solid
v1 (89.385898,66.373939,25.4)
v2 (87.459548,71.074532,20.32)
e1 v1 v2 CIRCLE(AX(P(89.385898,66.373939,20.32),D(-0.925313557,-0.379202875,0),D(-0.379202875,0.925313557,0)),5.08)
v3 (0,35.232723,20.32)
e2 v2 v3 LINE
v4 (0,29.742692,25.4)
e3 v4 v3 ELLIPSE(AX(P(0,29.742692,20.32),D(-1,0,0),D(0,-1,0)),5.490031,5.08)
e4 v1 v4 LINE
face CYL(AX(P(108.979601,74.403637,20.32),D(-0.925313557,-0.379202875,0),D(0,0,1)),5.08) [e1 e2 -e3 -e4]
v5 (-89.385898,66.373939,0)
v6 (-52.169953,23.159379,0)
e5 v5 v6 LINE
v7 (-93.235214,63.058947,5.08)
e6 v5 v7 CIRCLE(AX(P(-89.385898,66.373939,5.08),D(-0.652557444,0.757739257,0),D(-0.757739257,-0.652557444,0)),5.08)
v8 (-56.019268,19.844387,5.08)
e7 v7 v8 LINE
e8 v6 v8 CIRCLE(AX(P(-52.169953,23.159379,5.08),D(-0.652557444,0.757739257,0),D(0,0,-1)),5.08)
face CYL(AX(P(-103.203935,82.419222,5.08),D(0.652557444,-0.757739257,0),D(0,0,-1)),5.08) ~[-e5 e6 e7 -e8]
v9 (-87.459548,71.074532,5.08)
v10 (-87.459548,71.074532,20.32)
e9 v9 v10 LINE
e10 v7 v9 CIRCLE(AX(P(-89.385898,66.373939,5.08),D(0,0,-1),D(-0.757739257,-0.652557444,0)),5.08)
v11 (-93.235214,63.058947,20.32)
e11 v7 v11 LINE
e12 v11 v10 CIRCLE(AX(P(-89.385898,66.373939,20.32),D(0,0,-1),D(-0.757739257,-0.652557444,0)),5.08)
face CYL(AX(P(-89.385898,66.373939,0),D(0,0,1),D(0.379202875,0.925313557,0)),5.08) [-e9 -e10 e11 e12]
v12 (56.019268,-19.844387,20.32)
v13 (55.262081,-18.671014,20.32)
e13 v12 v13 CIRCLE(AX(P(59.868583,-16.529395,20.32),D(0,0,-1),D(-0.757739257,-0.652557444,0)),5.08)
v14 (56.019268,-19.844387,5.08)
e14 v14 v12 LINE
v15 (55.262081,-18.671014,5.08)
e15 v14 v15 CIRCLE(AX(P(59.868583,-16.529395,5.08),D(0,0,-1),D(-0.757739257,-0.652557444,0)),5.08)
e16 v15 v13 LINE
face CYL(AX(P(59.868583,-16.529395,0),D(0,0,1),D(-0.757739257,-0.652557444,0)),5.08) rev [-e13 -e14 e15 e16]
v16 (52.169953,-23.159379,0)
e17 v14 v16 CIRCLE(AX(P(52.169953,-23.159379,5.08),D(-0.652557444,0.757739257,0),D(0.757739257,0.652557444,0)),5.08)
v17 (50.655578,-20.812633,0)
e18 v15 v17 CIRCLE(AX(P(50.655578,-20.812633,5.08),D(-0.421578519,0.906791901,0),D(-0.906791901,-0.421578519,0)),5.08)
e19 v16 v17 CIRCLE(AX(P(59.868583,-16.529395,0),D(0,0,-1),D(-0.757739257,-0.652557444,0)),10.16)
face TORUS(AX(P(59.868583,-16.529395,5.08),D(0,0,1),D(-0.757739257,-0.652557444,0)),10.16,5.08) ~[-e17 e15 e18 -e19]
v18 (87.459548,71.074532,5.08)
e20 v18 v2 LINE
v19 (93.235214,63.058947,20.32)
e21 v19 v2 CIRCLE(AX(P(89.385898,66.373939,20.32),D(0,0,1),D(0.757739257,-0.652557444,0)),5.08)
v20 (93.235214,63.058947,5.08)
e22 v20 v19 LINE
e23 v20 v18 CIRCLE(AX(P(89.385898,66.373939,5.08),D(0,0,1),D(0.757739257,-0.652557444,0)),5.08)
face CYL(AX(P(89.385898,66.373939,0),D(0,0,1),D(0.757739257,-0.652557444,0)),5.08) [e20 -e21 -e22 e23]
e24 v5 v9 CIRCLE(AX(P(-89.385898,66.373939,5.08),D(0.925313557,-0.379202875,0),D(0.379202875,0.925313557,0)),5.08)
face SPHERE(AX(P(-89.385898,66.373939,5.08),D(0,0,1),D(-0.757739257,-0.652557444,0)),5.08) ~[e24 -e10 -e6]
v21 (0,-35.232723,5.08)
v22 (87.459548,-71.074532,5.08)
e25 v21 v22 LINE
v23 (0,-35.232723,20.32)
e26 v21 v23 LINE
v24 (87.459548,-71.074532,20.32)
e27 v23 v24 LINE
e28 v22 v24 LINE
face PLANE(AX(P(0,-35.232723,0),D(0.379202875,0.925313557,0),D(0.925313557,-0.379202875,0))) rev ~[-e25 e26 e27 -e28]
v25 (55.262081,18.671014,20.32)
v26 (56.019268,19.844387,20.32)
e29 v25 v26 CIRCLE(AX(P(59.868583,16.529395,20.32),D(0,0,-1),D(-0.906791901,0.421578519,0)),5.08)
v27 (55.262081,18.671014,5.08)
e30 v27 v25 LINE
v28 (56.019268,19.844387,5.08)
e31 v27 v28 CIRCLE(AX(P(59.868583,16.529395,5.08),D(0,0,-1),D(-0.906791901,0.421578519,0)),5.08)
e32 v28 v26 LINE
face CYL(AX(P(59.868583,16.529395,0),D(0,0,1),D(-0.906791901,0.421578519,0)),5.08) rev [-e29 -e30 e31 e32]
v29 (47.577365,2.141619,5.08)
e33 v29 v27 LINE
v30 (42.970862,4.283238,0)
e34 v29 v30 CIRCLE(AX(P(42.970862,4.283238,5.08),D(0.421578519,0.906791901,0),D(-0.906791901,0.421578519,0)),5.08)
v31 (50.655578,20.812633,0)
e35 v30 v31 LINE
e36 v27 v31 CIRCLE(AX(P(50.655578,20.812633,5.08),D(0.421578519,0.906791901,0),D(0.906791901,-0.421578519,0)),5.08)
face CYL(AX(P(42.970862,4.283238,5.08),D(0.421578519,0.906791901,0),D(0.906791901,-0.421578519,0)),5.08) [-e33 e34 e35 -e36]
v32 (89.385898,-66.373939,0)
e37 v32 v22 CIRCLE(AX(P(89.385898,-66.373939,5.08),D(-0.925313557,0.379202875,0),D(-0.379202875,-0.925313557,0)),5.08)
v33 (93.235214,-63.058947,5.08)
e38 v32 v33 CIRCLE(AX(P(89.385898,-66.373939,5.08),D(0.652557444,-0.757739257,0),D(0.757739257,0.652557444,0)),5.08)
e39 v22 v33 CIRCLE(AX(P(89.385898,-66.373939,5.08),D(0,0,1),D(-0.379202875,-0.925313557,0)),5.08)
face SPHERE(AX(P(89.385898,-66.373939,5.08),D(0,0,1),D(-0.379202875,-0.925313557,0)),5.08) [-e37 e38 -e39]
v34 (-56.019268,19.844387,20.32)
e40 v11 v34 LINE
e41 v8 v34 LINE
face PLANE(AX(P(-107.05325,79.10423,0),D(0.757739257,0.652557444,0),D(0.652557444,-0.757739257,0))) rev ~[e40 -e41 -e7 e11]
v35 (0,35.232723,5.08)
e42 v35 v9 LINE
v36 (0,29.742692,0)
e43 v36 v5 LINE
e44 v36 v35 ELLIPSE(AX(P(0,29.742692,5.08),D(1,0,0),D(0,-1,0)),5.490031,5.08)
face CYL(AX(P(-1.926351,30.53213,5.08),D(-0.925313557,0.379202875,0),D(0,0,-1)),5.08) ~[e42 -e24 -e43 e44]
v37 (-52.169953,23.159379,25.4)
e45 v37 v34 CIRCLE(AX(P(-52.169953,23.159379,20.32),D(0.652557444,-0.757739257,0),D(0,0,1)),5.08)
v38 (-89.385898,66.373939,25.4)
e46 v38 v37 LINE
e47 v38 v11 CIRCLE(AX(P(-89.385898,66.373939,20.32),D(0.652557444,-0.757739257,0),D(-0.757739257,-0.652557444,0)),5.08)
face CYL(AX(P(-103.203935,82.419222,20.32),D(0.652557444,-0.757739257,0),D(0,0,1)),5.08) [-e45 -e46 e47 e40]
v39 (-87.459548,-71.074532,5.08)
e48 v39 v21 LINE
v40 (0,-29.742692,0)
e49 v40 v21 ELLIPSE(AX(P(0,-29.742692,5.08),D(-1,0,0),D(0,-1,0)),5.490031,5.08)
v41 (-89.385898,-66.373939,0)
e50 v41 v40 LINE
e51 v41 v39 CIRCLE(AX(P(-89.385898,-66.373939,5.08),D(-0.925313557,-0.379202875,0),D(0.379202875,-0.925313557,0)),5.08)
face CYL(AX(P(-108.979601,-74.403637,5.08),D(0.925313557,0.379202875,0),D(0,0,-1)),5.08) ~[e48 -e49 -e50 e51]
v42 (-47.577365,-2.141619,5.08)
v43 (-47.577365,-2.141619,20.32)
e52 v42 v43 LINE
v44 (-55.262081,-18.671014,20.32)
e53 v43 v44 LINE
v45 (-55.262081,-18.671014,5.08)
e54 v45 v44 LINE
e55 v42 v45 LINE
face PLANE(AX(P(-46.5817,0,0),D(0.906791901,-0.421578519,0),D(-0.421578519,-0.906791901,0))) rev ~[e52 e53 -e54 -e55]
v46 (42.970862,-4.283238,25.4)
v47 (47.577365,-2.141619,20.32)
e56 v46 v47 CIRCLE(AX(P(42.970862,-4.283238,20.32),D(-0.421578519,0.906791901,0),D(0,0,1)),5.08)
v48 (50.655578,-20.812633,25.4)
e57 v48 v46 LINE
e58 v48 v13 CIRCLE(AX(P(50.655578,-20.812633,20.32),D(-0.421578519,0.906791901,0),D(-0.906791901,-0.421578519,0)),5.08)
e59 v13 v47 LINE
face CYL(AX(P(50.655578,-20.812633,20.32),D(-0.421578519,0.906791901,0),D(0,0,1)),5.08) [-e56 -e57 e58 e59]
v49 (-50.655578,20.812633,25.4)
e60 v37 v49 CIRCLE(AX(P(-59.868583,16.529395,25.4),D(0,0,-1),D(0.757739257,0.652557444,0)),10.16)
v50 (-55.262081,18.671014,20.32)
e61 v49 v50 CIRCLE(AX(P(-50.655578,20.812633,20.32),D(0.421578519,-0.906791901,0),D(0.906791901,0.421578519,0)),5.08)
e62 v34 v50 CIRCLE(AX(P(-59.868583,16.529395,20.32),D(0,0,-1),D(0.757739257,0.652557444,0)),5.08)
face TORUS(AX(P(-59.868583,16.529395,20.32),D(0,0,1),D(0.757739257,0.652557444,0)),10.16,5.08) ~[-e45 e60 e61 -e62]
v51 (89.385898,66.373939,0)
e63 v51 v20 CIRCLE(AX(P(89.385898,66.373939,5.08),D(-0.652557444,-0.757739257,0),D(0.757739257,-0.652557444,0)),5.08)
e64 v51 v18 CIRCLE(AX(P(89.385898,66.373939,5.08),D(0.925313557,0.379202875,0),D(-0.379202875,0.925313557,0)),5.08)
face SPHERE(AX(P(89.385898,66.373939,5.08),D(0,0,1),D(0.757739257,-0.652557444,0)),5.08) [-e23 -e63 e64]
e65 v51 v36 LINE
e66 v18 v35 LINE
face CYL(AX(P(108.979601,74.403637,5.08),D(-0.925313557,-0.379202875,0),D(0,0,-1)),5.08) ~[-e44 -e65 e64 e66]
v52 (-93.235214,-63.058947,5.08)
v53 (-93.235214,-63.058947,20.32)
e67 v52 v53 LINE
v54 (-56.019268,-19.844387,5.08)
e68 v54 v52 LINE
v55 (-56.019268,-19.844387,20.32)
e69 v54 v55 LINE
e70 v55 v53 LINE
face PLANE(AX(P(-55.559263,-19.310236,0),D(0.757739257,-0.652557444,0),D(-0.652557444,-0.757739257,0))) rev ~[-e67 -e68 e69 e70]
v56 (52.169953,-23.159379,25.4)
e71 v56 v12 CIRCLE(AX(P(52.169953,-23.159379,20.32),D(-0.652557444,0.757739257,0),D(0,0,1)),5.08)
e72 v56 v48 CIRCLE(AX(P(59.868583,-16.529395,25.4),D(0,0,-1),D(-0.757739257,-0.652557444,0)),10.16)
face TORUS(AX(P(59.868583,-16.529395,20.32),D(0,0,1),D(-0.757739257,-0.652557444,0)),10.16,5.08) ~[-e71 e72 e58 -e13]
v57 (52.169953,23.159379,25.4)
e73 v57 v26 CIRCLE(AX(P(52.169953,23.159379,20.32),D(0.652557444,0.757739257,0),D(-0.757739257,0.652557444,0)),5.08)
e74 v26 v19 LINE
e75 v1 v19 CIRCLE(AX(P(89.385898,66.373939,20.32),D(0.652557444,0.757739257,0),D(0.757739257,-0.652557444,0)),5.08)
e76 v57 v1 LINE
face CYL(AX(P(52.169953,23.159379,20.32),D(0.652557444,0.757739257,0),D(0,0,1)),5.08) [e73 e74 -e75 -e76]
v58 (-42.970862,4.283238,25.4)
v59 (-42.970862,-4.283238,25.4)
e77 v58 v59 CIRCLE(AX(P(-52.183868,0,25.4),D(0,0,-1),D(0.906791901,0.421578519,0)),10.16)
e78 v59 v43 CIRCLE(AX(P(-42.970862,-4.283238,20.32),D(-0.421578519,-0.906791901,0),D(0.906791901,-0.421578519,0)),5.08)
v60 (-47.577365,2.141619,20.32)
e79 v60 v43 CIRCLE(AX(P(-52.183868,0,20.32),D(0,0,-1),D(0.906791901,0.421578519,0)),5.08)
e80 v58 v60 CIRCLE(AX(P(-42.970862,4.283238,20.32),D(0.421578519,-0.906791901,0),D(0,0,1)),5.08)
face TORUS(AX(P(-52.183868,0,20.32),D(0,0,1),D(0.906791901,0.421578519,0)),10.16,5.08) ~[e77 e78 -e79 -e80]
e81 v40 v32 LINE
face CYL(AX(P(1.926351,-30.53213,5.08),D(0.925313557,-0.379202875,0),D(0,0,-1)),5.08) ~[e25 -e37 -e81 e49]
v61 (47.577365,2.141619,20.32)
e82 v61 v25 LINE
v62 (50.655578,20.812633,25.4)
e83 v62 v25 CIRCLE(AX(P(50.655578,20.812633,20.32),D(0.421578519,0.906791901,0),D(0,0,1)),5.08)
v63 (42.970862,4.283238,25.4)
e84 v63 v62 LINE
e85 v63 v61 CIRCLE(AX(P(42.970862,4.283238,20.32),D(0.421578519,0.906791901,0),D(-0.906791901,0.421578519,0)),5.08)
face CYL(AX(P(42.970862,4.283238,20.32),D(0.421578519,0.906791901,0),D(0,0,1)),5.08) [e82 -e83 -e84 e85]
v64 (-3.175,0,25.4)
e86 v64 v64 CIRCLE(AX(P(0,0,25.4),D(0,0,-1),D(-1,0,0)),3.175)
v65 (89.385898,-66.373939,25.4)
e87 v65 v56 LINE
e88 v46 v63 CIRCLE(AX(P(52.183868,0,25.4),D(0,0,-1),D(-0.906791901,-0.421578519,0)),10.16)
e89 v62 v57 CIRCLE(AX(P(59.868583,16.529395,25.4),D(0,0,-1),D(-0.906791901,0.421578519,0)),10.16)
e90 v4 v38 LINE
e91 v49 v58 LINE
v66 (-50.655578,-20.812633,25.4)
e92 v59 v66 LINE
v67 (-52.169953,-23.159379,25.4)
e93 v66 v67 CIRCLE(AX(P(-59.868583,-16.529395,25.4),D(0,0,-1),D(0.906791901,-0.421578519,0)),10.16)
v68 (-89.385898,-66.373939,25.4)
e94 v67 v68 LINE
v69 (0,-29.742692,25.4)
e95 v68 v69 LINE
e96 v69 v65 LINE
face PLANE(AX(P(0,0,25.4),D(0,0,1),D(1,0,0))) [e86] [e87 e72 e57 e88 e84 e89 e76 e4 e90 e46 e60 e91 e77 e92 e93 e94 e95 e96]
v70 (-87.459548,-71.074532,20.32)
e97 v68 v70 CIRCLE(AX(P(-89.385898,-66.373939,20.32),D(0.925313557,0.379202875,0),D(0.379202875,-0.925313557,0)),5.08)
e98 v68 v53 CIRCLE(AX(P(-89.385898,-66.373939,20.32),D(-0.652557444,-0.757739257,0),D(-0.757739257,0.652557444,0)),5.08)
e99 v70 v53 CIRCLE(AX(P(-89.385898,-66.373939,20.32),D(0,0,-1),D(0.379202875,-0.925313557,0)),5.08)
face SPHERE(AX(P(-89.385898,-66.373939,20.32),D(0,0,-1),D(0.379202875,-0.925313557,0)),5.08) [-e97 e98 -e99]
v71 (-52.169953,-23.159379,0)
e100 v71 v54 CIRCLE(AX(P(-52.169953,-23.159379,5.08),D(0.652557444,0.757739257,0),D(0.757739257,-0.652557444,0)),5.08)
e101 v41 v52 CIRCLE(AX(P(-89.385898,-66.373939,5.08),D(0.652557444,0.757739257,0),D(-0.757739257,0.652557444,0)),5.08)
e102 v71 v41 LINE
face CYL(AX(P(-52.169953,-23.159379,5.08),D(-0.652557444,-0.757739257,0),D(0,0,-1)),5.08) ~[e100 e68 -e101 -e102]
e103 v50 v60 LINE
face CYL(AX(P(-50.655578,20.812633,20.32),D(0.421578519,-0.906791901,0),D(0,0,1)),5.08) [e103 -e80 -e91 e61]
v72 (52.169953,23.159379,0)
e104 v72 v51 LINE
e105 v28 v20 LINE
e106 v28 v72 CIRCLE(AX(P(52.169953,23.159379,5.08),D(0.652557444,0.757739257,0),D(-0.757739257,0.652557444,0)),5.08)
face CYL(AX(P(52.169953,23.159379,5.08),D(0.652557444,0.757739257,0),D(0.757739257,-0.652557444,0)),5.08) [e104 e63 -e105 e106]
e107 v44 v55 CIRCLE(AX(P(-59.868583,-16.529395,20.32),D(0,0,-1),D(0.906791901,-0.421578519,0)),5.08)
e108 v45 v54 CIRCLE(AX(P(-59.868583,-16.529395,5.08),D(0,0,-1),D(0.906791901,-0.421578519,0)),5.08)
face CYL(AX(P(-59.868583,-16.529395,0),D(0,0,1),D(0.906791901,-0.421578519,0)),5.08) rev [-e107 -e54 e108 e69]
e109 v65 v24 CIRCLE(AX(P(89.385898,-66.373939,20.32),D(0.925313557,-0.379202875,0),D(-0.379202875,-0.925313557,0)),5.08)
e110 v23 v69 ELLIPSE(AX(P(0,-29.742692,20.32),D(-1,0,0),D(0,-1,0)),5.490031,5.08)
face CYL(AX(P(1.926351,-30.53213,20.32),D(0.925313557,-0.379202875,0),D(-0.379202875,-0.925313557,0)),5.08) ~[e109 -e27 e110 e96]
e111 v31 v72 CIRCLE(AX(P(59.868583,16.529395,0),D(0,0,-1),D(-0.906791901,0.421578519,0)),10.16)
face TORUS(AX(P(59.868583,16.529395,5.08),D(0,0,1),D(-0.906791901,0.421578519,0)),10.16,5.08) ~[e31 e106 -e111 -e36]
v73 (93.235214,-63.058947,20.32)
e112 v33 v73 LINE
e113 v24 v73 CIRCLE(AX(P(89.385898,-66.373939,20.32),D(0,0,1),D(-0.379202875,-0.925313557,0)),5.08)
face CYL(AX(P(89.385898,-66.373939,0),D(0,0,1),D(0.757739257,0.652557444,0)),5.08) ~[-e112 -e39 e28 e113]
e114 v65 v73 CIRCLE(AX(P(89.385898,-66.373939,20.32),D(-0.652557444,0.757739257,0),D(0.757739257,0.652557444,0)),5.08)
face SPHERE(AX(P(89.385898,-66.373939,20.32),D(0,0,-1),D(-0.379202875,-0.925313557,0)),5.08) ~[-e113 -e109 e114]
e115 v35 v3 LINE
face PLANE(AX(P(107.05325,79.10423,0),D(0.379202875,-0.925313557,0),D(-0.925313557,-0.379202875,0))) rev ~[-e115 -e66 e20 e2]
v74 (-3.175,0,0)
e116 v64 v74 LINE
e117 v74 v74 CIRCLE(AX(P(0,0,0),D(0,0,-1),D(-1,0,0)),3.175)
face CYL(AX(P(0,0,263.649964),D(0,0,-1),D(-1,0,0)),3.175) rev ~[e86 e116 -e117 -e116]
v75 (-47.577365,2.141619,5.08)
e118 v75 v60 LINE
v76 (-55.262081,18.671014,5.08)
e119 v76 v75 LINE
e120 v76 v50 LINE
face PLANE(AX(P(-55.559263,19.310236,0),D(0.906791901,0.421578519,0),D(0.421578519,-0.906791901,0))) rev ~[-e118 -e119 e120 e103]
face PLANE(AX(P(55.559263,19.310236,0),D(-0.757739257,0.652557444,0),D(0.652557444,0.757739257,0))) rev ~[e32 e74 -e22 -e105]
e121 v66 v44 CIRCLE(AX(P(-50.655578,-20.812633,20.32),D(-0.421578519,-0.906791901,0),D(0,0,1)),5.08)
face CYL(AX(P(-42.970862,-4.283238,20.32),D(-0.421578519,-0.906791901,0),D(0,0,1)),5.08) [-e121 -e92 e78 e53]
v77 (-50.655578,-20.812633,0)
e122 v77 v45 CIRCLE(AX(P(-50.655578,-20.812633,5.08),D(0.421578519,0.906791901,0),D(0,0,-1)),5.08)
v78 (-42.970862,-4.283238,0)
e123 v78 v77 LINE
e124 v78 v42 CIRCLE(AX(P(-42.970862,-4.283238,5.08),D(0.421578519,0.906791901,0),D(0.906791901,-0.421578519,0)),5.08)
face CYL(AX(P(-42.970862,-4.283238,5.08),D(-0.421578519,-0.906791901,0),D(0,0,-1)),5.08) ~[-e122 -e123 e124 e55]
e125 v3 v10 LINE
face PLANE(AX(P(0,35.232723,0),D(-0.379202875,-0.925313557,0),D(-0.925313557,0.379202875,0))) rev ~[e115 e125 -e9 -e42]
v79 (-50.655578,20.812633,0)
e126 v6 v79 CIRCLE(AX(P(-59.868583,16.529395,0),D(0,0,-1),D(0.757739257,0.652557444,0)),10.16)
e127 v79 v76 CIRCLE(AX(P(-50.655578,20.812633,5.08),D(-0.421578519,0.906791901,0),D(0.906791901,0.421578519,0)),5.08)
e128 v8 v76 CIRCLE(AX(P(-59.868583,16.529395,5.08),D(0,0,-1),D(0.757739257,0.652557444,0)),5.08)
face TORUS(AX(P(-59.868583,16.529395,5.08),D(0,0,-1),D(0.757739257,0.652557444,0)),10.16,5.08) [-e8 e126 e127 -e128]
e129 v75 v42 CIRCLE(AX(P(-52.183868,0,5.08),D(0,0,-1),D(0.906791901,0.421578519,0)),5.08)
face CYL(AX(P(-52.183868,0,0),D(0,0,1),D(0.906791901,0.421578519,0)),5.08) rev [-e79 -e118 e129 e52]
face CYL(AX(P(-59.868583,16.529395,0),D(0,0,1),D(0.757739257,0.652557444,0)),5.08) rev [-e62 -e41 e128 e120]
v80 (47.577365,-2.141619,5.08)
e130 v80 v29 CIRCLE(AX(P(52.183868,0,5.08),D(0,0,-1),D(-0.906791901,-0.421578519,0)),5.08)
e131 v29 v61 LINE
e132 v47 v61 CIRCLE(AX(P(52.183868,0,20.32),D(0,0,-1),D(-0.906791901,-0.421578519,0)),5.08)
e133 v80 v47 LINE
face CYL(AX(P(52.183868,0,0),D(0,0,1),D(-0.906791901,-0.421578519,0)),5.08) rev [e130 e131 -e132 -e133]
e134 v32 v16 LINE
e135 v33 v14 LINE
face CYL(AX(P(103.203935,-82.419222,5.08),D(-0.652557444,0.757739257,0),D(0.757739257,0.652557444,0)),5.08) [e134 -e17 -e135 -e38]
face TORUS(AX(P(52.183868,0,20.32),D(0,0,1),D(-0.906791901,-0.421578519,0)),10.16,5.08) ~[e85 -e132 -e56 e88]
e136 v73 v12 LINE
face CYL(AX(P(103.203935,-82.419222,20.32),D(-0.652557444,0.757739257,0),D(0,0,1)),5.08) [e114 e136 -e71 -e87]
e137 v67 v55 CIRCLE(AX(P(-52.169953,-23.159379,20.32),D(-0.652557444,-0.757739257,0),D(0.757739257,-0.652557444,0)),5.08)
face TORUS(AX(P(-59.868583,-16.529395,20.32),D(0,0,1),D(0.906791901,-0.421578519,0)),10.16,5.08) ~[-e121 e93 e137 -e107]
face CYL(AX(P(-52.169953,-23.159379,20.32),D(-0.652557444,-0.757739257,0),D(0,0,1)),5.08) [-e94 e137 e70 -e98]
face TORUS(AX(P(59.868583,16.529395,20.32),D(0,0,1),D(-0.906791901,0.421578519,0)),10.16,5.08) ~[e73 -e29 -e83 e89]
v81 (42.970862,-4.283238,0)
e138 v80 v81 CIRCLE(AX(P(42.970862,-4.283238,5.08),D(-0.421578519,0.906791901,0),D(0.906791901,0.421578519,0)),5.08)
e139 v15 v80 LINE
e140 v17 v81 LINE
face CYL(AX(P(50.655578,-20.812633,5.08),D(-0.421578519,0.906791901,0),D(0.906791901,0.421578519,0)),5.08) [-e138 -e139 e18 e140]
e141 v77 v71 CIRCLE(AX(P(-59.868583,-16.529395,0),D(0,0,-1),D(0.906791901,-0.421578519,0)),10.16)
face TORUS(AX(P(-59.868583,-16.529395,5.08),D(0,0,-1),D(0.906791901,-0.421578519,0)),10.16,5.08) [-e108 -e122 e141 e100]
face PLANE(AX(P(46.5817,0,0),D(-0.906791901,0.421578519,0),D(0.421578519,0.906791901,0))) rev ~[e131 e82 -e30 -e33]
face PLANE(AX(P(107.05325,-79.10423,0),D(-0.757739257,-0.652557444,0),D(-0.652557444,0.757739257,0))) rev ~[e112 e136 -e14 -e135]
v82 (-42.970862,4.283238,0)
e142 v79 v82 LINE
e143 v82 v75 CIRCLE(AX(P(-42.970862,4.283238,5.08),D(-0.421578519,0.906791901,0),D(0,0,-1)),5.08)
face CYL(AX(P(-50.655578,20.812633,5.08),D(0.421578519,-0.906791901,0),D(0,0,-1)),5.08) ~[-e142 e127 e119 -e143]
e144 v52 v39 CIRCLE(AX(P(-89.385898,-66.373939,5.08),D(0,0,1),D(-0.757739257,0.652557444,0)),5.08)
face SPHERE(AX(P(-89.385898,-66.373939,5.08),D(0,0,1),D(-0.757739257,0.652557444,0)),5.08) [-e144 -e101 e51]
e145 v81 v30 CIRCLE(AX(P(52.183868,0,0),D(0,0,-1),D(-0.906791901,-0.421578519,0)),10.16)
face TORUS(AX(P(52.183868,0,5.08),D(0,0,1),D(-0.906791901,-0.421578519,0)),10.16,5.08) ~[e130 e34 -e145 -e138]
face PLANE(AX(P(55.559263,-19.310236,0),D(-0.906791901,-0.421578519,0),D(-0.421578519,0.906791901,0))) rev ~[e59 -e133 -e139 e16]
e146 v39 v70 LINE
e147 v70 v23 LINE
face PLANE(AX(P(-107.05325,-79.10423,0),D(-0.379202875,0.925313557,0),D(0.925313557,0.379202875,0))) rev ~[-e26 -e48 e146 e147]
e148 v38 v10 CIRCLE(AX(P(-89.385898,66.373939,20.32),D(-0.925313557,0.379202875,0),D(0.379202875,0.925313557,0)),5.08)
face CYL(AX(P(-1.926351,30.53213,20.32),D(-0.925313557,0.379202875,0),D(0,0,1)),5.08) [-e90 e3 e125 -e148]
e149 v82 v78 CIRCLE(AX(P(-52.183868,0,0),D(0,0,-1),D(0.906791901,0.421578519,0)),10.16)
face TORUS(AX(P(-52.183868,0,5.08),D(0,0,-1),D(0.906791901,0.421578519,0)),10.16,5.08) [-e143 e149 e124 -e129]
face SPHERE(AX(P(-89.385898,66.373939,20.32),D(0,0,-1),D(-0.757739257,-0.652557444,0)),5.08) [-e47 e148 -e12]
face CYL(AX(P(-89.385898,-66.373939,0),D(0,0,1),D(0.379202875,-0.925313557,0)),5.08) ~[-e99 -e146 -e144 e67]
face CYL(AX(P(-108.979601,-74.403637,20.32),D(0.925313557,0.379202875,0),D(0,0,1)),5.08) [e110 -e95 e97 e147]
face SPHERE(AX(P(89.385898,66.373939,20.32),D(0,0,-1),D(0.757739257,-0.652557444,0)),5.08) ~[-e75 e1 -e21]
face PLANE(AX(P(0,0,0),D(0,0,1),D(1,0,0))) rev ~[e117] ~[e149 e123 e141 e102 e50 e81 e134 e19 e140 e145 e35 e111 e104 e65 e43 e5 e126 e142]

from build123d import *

# Parameters (mm, degrees)
F2_DEPTH = 25.4
F3_F1_R  = 5.08
F3_F2_R  = 5.08
F6_D     = 6.35


# Not quite as in the source:
# - the program builds the solid bodies; features that only make, move or delete a surface that nothing else refers to are left out


with BuildPart() as f2:
    # F1 (on Top) → F2 (new body)
    with BuildSketch(Plane.XY):
        Polygon((-107.0532500744, -79.1042298079), (0, -35.2327227592), (107.0532500744, -79.1042298079), (55.5592626333, -19.3102359772), (46.5817004442, 0), (55.5592626333, 19.3102359772), (107.0532500744, 79.1042298079), (0, 35.2327227592), (-107.0532500744, 79.1042298079), (-55.5592626333, 19.3102359772), (-46.5817004442, 0), (-55.5592626333, -19.3102359772), align=None)
    extrude(amount=F2_DEPTH)

    # F3: fillet of radius 5.08 on 32 edges, made by hand

    # F3_f1
    f3_f1_edges = [f2.edges().sort_by_distance(p)[0] for p in [
        (-55.5592626333, -19.3102359772, 12.7),
        (-46.5817004442, 0, 12.7),
        (-55.5592626333, 19.3102359772, 12.7),
        (55.5592626333, -19.3102359772, 12.7),
        (46.5817004442, 0, 12.7),
        (55.5592626333, 19.3102359772, 12.7),
    ]]
    fillet(f3_f1_edges, radius=F3_F1_R)

    # F3_f2
    f3_f2_edges = [f2.edges().sort_by_distance(p)[0] for p in [
        (53.5266250372, 57.1684762836, 25.4),
        (53.5266250372, 57.1684762836, 0),
        (107.0532500744, 79.1042298079, 12.7),
        (81.5362590314, 49.4743083195, 25.4),
        (51.4197227557, 10.4063163842, 25.4),
        (51.4197227557, -10.4063163842, 25.4),
        (81.5362590314, -49.4743083195, 25.4),
        (107.0532500744, -79.1042298079, 12.7),
        (53.5266250372, -57.1684762836, 0),
        (53.5266250372, -57.1684762836, 25.4),
        (-81.5362590314, 49.4743083195, 25.4),
        (-53.5266250372, 57.1684762836, 25.4),
        (-51.4197227557, 10.4063163842, 25.4),
        (-51.4197227557, -10.4063163842, 25.4),
        (-81.5362590314, -49.4743083195, 25.4),
        (-53.5266250372, 57.1684762836, 0),
        (-107.0532500744, 79.1042298079, 12.7),
        (-81.5362590314, 49.4743083195, 0),
        (-53.5266250372, -57.1684762836, 0),
        (-107.0532500744, -79.1042298079, 12.7),
        (-53.5266250372, -57.1684762836, 25.4),
        (81.5362590314, -49.4743083195, 0),
        (51.4197227557, -10.4063163842, 0),
        (51.4197227557, 10.4063163842, 0),
        (-51.4197227557, 10.4063163842, 0),
        (-51.4197227557, -10.4063163842, 0),
        (-47.1038678133, 0, 0),
        (-55.6001625442, -19.2838429205, 0),
        (-55.6001625442, 19.2838429205, 0),
        (47.1038678133, 0, 0),
        (55.6001625442, 19.2838429205, 0),
        (55.6001625442, -19.2838429205, 0),
        (-55.6001625442, -19.2838429205, 25.4),
        (-47.1038678133, 0, 25.4),
        (-55.6001625442, 19.2838429205, 25.4),
        (55.6001625442, -19.2838429205, 25.4),
        (47.1038678133, 0, 25.4),
        (55.6001625442, 19.2838429205, 25.4),
    ]]
    fillet(f3_f2_edges, radius=F3_F2_R)

    # F6 (through all)
    with Locations(Plane.XY.offset(25.4)):
        with Locations((0, 0)):
            Hole(F6_D / 2)


solid = f2.part
